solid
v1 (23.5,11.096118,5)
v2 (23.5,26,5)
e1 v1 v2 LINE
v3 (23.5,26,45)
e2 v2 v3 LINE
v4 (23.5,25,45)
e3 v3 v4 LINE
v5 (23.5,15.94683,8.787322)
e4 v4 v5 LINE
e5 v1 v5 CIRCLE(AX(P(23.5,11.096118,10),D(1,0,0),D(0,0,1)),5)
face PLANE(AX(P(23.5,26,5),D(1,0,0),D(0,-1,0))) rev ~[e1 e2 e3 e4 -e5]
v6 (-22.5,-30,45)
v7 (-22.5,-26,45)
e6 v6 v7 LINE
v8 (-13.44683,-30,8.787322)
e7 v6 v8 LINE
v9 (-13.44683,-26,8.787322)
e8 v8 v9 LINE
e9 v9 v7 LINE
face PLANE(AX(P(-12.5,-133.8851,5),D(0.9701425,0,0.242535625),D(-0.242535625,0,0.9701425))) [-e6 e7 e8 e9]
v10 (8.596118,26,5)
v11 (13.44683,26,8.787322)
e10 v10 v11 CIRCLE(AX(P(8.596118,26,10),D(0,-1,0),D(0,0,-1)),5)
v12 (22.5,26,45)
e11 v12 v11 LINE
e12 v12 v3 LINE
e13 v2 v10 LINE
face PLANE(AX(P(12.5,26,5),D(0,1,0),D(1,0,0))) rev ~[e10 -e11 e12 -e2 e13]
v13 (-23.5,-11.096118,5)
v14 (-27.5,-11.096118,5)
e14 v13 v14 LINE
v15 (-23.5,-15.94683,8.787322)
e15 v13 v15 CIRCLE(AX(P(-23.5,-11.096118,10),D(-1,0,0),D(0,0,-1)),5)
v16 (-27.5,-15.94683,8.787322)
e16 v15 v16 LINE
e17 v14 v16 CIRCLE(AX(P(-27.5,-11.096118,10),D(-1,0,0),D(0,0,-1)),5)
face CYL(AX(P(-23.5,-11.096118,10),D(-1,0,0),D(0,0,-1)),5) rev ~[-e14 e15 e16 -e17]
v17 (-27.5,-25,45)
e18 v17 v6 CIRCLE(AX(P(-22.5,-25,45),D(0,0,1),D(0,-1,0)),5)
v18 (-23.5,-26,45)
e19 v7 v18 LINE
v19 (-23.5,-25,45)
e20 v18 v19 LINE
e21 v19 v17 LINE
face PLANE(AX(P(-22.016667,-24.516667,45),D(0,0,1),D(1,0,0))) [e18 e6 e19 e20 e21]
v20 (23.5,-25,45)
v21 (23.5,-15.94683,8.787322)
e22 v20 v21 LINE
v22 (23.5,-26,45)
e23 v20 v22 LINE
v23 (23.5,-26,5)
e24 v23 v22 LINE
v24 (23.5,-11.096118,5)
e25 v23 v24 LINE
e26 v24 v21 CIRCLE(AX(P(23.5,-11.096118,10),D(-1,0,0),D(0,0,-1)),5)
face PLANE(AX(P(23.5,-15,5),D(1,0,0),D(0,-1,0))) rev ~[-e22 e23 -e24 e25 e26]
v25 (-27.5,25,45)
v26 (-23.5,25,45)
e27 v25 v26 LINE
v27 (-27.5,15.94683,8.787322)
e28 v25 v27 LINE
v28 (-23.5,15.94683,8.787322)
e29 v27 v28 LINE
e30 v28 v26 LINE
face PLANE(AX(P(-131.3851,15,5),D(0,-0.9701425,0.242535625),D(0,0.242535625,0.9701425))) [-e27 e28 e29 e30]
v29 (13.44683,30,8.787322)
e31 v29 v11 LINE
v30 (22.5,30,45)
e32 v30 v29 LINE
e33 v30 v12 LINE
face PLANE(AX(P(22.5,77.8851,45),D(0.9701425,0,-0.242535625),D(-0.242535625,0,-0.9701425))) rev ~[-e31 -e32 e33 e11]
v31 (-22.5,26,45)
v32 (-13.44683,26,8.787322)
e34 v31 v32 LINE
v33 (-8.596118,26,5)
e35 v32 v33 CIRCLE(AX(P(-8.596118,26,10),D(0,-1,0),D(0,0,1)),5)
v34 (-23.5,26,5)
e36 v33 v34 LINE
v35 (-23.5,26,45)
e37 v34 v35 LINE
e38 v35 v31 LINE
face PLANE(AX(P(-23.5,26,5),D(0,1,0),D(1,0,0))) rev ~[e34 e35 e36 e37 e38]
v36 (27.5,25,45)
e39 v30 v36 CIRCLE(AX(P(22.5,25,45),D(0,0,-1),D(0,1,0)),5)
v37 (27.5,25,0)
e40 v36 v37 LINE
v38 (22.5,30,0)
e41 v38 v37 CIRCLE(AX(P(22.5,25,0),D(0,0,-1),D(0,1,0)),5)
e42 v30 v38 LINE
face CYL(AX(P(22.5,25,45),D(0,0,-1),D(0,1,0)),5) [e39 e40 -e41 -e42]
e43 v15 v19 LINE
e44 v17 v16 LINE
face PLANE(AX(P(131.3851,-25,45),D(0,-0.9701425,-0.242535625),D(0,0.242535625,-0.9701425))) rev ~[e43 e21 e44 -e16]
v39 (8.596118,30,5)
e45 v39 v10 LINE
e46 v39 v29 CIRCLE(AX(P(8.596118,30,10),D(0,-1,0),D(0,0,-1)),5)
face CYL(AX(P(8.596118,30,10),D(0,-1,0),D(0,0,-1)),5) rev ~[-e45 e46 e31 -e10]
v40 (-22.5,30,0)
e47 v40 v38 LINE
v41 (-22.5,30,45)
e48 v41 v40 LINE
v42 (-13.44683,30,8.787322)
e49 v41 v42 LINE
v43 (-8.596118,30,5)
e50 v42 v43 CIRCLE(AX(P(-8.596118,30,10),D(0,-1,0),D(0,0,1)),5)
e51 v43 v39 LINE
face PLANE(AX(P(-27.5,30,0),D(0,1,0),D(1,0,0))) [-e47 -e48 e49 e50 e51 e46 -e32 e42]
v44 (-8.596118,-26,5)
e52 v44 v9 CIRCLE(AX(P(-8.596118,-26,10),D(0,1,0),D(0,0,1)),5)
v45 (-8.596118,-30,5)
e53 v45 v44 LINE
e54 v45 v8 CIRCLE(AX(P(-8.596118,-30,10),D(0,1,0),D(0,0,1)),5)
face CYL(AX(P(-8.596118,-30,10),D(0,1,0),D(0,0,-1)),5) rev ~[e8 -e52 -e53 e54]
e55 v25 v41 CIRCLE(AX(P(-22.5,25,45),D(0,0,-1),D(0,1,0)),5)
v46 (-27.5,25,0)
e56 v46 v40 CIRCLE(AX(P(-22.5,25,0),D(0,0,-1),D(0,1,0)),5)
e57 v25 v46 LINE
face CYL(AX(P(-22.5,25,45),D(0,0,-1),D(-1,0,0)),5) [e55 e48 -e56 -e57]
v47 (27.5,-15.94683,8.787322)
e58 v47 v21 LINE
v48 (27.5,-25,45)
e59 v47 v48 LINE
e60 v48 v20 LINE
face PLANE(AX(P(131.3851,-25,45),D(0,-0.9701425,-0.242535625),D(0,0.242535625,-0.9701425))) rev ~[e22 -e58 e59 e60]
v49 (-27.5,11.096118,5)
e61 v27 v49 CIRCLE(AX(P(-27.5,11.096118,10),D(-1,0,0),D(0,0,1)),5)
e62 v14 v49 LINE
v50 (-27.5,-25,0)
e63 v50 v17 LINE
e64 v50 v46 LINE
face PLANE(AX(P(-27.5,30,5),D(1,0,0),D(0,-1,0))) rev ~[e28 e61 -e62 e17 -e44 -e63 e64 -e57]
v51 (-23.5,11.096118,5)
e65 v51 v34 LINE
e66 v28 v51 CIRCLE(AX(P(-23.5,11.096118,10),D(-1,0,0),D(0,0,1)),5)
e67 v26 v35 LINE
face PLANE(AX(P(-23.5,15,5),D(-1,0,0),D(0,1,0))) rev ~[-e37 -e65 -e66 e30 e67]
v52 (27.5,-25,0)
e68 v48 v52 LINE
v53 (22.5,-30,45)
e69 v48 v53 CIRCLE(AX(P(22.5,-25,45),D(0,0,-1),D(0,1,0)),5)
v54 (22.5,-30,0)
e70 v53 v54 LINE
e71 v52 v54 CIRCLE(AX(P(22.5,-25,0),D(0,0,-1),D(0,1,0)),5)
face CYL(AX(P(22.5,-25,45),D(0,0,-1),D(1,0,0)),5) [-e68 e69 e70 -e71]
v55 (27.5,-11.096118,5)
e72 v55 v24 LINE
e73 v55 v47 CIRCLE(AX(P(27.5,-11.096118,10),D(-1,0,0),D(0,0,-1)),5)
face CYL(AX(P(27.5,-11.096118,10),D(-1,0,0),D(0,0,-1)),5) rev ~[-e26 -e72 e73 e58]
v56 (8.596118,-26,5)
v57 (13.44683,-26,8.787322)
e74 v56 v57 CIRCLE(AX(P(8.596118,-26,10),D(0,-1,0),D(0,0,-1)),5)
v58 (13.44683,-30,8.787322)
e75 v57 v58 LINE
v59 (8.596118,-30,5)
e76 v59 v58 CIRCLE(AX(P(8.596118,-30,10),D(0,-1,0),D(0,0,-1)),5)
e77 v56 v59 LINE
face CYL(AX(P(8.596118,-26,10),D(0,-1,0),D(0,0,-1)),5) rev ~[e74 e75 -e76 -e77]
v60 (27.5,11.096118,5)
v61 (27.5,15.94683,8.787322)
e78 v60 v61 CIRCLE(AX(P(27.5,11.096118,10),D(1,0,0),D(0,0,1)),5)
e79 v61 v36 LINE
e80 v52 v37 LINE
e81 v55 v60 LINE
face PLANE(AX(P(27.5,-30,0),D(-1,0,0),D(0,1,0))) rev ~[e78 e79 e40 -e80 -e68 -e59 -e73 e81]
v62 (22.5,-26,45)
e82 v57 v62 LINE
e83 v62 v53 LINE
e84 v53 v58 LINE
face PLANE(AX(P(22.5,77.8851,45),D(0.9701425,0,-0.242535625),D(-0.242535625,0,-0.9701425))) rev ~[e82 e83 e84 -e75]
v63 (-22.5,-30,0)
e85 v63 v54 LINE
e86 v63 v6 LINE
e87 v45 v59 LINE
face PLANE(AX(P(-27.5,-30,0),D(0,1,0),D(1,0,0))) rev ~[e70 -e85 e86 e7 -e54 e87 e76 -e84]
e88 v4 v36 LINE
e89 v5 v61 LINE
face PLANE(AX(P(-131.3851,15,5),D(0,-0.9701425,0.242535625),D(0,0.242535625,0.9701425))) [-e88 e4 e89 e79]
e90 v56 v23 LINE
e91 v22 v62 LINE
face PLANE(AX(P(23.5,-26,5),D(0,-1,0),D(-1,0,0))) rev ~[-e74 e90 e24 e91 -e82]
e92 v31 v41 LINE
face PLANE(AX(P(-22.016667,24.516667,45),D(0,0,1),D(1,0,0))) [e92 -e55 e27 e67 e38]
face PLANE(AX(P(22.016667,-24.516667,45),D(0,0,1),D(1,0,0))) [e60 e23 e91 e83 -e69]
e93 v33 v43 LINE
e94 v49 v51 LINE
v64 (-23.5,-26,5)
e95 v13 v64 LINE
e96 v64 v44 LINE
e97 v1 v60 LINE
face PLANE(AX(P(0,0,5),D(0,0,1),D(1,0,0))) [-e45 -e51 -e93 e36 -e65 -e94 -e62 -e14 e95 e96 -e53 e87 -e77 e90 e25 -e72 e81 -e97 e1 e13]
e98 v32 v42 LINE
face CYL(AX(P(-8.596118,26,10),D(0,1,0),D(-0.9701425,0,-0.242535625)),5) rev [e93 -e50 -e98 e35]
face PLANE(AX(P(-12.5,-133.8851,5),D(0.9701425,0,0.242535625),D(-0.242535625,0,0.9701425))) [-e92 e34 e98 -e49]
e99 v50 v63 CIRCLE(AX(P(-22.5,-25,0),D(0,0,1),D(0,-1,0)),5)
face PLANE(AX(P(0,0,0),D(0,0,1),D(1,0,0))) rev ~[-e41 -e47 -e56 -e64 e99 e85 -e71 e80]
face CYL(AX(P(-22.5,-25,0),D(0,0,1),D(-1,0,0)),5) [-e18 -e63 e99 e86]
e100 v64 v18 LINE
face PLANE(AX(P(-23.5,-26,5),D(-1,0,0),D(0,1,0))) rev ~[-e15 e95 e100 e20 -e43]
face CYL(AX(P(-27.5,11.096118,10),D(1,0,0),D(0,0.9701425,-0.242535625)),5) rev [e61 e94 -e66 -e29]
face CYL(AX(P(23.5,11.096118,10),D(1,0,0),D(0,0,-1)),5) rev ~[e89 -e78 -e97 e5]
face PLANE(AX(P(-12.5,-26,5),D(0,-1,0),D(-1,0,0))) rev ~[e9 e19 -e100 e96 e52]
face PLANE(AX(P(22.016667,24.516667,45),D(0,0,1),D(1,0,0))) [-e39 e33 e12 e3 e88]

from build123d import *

# Parameters (mm, degrees)
F0_W         = 55
F0_H         = 60
F1_DEPTH     = 5
F3_DEPTH     = 40
F5_T4_DEPTH  = 211.7701999818
F5_T9_DEPTH  = 211.7701999818
F5_T14_DEPTH = 211.7701999818
F5_T19_DEPTH = 211.7701999818
F5_T24_DEPTH = 211.7701999818
F5_T29_DEPTH = 211.7701999818
F5_T34_DEPTH = 211.7701999818
F5_T39_DEPTH = 211.7701999818
F7_R         = 5
F8_R         = 5


# Not quite as in the source:
# - a fillet or chamfer that OpenCascade refuses, or shapes differently, is made with other operations: its cross-section is extruded or revolved along the edge and cut away or added
# - two fillets or chamfers of one size are made in one step
# - a feature of the source that left no trace in its solid (it failed there, or was rolled back) is left out


with BuildPart() as f1:
    # F0 (on Top) → F1 (new body)
    with BuildSketch(Plane.XY):
        Rectangle(F0_W, F0_H)
    extrude(amount=F1_DEPTH)

    # F2 (on face) → F3 (join)
    with BuildSketch(Plane.XY.offset(5)):
        Polygon((-23.5, 15), (-23.5, 26), (-12.5, 26), (-12.5, 30), (-27.5, 30), (-27.5, 15), align=None)
        Polygon((12.5, 30), (12.5, 26), (23.5, 26), (23.5, 15), (27.5, 15), (27.5, 30), align=None)
        Polygon((23.5, -26), (12.5, -26), (12.5, -30), (27.5, -30), (27.5, -15), (23.5, -15), align=None)
        Polygon((-23.5, -26), (-23.5, -15), (-27.5, -15), (-27.5, -30), (-12.5, -30), (-12.5, -26), align=None)
    extrude(amount=F3_DEPTH)

    # F5: chamfer of 10 x 40 on 8 edges, made by hand


with BuildPart() as f5_tool2:
    # F5_s3 → F5_t4 (new body)
    with BuildSketch(Plane.YZ.offset(-131.3850999909)):
        Polygon((15, 5), (25, 45), (15, 45), align=None)
    extrude(amount=F5_T4_DEPTH)

    split(bisect_by=Plane.XY.offset(5), keep=Keep.TOP)


with BuildPart() as f1_1:
    add(f1.part)

    # F5_t1: cut F5_tool2
    add(f5_tool2.part, mode=Mode.SUBTRACT)


with BuildPart() as f5_tool7:
    # F5_s8 → F5_t9 (new body)
    with BuildSketch(Plane.XZ.offset(-77.8850999909)):
        Polygon((22.5, 45), (12.5, 5), (12.5, 45), align=None)
    extrude(amount=F5_T9_DEPTH)

    split(bisect_by=Plane.XY.offset(5), keep=Keep.TOP)


with BuildPart() as f1_2:
    add(f1_1.part)

    # F5_t6: cut F5_tool7
    add(f5_tool7.part, mode=Mode.SUBTRACT)


with BuildPart() as f5_tool12:
    # F5_s13 → F5_t14 (new body)
    with BuildSketch(Plane.YZ.offset(-80.3850999909)):
        Polygon((15, 5), (25, 45), (15, 45), align=None)
    extrude(amount=F5_T14_DEPTH)

    split(bisect_by=Plane.XY.offset(5), keep=Keep.TOP)


with BuildPart() as f1_3:
    add(f1_2.part)

    # F5_t11: cut F5_tool12
    add(f5_tool12.part, mode=Mode.SUBTRACT)


with BuildPart() as f5_tool17:
    # F5_s18 → F5_t19 (new body)
    with BuildSketch(Plane.XZ.offset(-133.8850999909)):
        Polygon((12.5, 5), (22.5, 45), (12.5, 45), align=None)
    extrude(amount=F5_T19_DEPTH)

    split(bisect_by=Plane.XY.offset(5), keep=Keep.TOP)


with BuildPart() as f1_4:
    add(f1_3.part)

    # F5_t16: cut F5_tool17
    add(f5_tool17.part, mode=Mode.SUBTRACT)


with BuildPart() as f5_tool22:
    # F5_s23 → F5_t24 (new body)
    with BuildSketch(Plane.YZ.offset(131.3850999909)):
        Polygon((-25, 45), (-15, 5), (-15, 45), align=None)
    extrude(amount=-F5_T24_DEPTH)

    split(bisect_by=Plane.XY.offset(5), keep=Keep.TOP)


with BuildPart() as f1_5:
    add(f1_4.part)

    # F5_t21: cut F5_tool22
    add(f5_tool22.part, mode=Mode.SUBTRACT)


with BuildPart() as f5_tool27:
    # F5_s28 → F5_t29 (new body)
    with BuildSketch(Plane.XZ.offset(133.8850999909)):
        Polygon((-12.5, 5), (-22.5, 45), (-12.5, 45), align=None)
    extrude(amount=-F5_T29_DEPTH)

    split(bisect_by=Plane.XY.offset(5), keep=Keep.TOP)


with BuildPart() as f1_6:
    add(f1_5.part)

    # F5_t26: cut F5_tool27
    add(f5_tool27.part, mode=Mode.SUBTRACT)


with BuildPart() as f5_tool32:
    # F5_s33 → F5_t34 (new body)
    with BuildSketch(Plane.YZ.offset(80.3850999909)):
        Polygon((-15, 5), (-25, 45), (-15, 45), align=None)
    extrude(amount=-F5_T34_DEPTH)

    split(bisect_by=Plane.XY.offset(5), keep=Keep.TOP)


with BuildPart() as f1_7:
    add(f1_6.part)

    # F5_t31: cut F5_tool32
    add(f5_tool32.part, mode=Mode.SUBTRACT)


with BuildPart() as f5_tool37:
    # F5_s38 → F5_t39 (new body)
    with BuildSketch(Plane.XZ.offset(77.8850999909)):
        Polygon((-22.5, 45), (-12.5, 5), (-12.5, 45), align=None)
    extrude(amount=-F5_T39_DEPTH)

    split(bisect_by=Plane.XY.offset(5), keep=Keep.TOP)


with BuildPart() as f1_8:
    add(f1_7.part)

    # F5_t36: cut F5_tool37
    add(f5_tool37.part, mode=Mode.SUBTRACT)

    # F7
    f7_edges = [f1_8.edges().sort_by_distance(p)[0] for p in [
        (-27.5, -30, 22.5),
        (27.5, -30, 22.5),
        (27.5, 30, 22.5),
        (-27.5, 30, 22.5),
    ]]
    fillet(f7_edges, radius=F7_R)

    # F8
    f8_edges = [f1_8.edges().sort_by_distance(p)[0] for p in [
        (12.5, -28, 5),
        (12.5, 28, 5),
        (25.5, 15, 5),
        (-25.5, 15, 5),
        (-12.5, 28, 5),
        (-25.5, -15, 5),
        (-12.5, -28, 5),
        (25.5, -15, 5),
    ]]
    fillet(f8_edges, radius=F8_R)


solid = f1_8.part
